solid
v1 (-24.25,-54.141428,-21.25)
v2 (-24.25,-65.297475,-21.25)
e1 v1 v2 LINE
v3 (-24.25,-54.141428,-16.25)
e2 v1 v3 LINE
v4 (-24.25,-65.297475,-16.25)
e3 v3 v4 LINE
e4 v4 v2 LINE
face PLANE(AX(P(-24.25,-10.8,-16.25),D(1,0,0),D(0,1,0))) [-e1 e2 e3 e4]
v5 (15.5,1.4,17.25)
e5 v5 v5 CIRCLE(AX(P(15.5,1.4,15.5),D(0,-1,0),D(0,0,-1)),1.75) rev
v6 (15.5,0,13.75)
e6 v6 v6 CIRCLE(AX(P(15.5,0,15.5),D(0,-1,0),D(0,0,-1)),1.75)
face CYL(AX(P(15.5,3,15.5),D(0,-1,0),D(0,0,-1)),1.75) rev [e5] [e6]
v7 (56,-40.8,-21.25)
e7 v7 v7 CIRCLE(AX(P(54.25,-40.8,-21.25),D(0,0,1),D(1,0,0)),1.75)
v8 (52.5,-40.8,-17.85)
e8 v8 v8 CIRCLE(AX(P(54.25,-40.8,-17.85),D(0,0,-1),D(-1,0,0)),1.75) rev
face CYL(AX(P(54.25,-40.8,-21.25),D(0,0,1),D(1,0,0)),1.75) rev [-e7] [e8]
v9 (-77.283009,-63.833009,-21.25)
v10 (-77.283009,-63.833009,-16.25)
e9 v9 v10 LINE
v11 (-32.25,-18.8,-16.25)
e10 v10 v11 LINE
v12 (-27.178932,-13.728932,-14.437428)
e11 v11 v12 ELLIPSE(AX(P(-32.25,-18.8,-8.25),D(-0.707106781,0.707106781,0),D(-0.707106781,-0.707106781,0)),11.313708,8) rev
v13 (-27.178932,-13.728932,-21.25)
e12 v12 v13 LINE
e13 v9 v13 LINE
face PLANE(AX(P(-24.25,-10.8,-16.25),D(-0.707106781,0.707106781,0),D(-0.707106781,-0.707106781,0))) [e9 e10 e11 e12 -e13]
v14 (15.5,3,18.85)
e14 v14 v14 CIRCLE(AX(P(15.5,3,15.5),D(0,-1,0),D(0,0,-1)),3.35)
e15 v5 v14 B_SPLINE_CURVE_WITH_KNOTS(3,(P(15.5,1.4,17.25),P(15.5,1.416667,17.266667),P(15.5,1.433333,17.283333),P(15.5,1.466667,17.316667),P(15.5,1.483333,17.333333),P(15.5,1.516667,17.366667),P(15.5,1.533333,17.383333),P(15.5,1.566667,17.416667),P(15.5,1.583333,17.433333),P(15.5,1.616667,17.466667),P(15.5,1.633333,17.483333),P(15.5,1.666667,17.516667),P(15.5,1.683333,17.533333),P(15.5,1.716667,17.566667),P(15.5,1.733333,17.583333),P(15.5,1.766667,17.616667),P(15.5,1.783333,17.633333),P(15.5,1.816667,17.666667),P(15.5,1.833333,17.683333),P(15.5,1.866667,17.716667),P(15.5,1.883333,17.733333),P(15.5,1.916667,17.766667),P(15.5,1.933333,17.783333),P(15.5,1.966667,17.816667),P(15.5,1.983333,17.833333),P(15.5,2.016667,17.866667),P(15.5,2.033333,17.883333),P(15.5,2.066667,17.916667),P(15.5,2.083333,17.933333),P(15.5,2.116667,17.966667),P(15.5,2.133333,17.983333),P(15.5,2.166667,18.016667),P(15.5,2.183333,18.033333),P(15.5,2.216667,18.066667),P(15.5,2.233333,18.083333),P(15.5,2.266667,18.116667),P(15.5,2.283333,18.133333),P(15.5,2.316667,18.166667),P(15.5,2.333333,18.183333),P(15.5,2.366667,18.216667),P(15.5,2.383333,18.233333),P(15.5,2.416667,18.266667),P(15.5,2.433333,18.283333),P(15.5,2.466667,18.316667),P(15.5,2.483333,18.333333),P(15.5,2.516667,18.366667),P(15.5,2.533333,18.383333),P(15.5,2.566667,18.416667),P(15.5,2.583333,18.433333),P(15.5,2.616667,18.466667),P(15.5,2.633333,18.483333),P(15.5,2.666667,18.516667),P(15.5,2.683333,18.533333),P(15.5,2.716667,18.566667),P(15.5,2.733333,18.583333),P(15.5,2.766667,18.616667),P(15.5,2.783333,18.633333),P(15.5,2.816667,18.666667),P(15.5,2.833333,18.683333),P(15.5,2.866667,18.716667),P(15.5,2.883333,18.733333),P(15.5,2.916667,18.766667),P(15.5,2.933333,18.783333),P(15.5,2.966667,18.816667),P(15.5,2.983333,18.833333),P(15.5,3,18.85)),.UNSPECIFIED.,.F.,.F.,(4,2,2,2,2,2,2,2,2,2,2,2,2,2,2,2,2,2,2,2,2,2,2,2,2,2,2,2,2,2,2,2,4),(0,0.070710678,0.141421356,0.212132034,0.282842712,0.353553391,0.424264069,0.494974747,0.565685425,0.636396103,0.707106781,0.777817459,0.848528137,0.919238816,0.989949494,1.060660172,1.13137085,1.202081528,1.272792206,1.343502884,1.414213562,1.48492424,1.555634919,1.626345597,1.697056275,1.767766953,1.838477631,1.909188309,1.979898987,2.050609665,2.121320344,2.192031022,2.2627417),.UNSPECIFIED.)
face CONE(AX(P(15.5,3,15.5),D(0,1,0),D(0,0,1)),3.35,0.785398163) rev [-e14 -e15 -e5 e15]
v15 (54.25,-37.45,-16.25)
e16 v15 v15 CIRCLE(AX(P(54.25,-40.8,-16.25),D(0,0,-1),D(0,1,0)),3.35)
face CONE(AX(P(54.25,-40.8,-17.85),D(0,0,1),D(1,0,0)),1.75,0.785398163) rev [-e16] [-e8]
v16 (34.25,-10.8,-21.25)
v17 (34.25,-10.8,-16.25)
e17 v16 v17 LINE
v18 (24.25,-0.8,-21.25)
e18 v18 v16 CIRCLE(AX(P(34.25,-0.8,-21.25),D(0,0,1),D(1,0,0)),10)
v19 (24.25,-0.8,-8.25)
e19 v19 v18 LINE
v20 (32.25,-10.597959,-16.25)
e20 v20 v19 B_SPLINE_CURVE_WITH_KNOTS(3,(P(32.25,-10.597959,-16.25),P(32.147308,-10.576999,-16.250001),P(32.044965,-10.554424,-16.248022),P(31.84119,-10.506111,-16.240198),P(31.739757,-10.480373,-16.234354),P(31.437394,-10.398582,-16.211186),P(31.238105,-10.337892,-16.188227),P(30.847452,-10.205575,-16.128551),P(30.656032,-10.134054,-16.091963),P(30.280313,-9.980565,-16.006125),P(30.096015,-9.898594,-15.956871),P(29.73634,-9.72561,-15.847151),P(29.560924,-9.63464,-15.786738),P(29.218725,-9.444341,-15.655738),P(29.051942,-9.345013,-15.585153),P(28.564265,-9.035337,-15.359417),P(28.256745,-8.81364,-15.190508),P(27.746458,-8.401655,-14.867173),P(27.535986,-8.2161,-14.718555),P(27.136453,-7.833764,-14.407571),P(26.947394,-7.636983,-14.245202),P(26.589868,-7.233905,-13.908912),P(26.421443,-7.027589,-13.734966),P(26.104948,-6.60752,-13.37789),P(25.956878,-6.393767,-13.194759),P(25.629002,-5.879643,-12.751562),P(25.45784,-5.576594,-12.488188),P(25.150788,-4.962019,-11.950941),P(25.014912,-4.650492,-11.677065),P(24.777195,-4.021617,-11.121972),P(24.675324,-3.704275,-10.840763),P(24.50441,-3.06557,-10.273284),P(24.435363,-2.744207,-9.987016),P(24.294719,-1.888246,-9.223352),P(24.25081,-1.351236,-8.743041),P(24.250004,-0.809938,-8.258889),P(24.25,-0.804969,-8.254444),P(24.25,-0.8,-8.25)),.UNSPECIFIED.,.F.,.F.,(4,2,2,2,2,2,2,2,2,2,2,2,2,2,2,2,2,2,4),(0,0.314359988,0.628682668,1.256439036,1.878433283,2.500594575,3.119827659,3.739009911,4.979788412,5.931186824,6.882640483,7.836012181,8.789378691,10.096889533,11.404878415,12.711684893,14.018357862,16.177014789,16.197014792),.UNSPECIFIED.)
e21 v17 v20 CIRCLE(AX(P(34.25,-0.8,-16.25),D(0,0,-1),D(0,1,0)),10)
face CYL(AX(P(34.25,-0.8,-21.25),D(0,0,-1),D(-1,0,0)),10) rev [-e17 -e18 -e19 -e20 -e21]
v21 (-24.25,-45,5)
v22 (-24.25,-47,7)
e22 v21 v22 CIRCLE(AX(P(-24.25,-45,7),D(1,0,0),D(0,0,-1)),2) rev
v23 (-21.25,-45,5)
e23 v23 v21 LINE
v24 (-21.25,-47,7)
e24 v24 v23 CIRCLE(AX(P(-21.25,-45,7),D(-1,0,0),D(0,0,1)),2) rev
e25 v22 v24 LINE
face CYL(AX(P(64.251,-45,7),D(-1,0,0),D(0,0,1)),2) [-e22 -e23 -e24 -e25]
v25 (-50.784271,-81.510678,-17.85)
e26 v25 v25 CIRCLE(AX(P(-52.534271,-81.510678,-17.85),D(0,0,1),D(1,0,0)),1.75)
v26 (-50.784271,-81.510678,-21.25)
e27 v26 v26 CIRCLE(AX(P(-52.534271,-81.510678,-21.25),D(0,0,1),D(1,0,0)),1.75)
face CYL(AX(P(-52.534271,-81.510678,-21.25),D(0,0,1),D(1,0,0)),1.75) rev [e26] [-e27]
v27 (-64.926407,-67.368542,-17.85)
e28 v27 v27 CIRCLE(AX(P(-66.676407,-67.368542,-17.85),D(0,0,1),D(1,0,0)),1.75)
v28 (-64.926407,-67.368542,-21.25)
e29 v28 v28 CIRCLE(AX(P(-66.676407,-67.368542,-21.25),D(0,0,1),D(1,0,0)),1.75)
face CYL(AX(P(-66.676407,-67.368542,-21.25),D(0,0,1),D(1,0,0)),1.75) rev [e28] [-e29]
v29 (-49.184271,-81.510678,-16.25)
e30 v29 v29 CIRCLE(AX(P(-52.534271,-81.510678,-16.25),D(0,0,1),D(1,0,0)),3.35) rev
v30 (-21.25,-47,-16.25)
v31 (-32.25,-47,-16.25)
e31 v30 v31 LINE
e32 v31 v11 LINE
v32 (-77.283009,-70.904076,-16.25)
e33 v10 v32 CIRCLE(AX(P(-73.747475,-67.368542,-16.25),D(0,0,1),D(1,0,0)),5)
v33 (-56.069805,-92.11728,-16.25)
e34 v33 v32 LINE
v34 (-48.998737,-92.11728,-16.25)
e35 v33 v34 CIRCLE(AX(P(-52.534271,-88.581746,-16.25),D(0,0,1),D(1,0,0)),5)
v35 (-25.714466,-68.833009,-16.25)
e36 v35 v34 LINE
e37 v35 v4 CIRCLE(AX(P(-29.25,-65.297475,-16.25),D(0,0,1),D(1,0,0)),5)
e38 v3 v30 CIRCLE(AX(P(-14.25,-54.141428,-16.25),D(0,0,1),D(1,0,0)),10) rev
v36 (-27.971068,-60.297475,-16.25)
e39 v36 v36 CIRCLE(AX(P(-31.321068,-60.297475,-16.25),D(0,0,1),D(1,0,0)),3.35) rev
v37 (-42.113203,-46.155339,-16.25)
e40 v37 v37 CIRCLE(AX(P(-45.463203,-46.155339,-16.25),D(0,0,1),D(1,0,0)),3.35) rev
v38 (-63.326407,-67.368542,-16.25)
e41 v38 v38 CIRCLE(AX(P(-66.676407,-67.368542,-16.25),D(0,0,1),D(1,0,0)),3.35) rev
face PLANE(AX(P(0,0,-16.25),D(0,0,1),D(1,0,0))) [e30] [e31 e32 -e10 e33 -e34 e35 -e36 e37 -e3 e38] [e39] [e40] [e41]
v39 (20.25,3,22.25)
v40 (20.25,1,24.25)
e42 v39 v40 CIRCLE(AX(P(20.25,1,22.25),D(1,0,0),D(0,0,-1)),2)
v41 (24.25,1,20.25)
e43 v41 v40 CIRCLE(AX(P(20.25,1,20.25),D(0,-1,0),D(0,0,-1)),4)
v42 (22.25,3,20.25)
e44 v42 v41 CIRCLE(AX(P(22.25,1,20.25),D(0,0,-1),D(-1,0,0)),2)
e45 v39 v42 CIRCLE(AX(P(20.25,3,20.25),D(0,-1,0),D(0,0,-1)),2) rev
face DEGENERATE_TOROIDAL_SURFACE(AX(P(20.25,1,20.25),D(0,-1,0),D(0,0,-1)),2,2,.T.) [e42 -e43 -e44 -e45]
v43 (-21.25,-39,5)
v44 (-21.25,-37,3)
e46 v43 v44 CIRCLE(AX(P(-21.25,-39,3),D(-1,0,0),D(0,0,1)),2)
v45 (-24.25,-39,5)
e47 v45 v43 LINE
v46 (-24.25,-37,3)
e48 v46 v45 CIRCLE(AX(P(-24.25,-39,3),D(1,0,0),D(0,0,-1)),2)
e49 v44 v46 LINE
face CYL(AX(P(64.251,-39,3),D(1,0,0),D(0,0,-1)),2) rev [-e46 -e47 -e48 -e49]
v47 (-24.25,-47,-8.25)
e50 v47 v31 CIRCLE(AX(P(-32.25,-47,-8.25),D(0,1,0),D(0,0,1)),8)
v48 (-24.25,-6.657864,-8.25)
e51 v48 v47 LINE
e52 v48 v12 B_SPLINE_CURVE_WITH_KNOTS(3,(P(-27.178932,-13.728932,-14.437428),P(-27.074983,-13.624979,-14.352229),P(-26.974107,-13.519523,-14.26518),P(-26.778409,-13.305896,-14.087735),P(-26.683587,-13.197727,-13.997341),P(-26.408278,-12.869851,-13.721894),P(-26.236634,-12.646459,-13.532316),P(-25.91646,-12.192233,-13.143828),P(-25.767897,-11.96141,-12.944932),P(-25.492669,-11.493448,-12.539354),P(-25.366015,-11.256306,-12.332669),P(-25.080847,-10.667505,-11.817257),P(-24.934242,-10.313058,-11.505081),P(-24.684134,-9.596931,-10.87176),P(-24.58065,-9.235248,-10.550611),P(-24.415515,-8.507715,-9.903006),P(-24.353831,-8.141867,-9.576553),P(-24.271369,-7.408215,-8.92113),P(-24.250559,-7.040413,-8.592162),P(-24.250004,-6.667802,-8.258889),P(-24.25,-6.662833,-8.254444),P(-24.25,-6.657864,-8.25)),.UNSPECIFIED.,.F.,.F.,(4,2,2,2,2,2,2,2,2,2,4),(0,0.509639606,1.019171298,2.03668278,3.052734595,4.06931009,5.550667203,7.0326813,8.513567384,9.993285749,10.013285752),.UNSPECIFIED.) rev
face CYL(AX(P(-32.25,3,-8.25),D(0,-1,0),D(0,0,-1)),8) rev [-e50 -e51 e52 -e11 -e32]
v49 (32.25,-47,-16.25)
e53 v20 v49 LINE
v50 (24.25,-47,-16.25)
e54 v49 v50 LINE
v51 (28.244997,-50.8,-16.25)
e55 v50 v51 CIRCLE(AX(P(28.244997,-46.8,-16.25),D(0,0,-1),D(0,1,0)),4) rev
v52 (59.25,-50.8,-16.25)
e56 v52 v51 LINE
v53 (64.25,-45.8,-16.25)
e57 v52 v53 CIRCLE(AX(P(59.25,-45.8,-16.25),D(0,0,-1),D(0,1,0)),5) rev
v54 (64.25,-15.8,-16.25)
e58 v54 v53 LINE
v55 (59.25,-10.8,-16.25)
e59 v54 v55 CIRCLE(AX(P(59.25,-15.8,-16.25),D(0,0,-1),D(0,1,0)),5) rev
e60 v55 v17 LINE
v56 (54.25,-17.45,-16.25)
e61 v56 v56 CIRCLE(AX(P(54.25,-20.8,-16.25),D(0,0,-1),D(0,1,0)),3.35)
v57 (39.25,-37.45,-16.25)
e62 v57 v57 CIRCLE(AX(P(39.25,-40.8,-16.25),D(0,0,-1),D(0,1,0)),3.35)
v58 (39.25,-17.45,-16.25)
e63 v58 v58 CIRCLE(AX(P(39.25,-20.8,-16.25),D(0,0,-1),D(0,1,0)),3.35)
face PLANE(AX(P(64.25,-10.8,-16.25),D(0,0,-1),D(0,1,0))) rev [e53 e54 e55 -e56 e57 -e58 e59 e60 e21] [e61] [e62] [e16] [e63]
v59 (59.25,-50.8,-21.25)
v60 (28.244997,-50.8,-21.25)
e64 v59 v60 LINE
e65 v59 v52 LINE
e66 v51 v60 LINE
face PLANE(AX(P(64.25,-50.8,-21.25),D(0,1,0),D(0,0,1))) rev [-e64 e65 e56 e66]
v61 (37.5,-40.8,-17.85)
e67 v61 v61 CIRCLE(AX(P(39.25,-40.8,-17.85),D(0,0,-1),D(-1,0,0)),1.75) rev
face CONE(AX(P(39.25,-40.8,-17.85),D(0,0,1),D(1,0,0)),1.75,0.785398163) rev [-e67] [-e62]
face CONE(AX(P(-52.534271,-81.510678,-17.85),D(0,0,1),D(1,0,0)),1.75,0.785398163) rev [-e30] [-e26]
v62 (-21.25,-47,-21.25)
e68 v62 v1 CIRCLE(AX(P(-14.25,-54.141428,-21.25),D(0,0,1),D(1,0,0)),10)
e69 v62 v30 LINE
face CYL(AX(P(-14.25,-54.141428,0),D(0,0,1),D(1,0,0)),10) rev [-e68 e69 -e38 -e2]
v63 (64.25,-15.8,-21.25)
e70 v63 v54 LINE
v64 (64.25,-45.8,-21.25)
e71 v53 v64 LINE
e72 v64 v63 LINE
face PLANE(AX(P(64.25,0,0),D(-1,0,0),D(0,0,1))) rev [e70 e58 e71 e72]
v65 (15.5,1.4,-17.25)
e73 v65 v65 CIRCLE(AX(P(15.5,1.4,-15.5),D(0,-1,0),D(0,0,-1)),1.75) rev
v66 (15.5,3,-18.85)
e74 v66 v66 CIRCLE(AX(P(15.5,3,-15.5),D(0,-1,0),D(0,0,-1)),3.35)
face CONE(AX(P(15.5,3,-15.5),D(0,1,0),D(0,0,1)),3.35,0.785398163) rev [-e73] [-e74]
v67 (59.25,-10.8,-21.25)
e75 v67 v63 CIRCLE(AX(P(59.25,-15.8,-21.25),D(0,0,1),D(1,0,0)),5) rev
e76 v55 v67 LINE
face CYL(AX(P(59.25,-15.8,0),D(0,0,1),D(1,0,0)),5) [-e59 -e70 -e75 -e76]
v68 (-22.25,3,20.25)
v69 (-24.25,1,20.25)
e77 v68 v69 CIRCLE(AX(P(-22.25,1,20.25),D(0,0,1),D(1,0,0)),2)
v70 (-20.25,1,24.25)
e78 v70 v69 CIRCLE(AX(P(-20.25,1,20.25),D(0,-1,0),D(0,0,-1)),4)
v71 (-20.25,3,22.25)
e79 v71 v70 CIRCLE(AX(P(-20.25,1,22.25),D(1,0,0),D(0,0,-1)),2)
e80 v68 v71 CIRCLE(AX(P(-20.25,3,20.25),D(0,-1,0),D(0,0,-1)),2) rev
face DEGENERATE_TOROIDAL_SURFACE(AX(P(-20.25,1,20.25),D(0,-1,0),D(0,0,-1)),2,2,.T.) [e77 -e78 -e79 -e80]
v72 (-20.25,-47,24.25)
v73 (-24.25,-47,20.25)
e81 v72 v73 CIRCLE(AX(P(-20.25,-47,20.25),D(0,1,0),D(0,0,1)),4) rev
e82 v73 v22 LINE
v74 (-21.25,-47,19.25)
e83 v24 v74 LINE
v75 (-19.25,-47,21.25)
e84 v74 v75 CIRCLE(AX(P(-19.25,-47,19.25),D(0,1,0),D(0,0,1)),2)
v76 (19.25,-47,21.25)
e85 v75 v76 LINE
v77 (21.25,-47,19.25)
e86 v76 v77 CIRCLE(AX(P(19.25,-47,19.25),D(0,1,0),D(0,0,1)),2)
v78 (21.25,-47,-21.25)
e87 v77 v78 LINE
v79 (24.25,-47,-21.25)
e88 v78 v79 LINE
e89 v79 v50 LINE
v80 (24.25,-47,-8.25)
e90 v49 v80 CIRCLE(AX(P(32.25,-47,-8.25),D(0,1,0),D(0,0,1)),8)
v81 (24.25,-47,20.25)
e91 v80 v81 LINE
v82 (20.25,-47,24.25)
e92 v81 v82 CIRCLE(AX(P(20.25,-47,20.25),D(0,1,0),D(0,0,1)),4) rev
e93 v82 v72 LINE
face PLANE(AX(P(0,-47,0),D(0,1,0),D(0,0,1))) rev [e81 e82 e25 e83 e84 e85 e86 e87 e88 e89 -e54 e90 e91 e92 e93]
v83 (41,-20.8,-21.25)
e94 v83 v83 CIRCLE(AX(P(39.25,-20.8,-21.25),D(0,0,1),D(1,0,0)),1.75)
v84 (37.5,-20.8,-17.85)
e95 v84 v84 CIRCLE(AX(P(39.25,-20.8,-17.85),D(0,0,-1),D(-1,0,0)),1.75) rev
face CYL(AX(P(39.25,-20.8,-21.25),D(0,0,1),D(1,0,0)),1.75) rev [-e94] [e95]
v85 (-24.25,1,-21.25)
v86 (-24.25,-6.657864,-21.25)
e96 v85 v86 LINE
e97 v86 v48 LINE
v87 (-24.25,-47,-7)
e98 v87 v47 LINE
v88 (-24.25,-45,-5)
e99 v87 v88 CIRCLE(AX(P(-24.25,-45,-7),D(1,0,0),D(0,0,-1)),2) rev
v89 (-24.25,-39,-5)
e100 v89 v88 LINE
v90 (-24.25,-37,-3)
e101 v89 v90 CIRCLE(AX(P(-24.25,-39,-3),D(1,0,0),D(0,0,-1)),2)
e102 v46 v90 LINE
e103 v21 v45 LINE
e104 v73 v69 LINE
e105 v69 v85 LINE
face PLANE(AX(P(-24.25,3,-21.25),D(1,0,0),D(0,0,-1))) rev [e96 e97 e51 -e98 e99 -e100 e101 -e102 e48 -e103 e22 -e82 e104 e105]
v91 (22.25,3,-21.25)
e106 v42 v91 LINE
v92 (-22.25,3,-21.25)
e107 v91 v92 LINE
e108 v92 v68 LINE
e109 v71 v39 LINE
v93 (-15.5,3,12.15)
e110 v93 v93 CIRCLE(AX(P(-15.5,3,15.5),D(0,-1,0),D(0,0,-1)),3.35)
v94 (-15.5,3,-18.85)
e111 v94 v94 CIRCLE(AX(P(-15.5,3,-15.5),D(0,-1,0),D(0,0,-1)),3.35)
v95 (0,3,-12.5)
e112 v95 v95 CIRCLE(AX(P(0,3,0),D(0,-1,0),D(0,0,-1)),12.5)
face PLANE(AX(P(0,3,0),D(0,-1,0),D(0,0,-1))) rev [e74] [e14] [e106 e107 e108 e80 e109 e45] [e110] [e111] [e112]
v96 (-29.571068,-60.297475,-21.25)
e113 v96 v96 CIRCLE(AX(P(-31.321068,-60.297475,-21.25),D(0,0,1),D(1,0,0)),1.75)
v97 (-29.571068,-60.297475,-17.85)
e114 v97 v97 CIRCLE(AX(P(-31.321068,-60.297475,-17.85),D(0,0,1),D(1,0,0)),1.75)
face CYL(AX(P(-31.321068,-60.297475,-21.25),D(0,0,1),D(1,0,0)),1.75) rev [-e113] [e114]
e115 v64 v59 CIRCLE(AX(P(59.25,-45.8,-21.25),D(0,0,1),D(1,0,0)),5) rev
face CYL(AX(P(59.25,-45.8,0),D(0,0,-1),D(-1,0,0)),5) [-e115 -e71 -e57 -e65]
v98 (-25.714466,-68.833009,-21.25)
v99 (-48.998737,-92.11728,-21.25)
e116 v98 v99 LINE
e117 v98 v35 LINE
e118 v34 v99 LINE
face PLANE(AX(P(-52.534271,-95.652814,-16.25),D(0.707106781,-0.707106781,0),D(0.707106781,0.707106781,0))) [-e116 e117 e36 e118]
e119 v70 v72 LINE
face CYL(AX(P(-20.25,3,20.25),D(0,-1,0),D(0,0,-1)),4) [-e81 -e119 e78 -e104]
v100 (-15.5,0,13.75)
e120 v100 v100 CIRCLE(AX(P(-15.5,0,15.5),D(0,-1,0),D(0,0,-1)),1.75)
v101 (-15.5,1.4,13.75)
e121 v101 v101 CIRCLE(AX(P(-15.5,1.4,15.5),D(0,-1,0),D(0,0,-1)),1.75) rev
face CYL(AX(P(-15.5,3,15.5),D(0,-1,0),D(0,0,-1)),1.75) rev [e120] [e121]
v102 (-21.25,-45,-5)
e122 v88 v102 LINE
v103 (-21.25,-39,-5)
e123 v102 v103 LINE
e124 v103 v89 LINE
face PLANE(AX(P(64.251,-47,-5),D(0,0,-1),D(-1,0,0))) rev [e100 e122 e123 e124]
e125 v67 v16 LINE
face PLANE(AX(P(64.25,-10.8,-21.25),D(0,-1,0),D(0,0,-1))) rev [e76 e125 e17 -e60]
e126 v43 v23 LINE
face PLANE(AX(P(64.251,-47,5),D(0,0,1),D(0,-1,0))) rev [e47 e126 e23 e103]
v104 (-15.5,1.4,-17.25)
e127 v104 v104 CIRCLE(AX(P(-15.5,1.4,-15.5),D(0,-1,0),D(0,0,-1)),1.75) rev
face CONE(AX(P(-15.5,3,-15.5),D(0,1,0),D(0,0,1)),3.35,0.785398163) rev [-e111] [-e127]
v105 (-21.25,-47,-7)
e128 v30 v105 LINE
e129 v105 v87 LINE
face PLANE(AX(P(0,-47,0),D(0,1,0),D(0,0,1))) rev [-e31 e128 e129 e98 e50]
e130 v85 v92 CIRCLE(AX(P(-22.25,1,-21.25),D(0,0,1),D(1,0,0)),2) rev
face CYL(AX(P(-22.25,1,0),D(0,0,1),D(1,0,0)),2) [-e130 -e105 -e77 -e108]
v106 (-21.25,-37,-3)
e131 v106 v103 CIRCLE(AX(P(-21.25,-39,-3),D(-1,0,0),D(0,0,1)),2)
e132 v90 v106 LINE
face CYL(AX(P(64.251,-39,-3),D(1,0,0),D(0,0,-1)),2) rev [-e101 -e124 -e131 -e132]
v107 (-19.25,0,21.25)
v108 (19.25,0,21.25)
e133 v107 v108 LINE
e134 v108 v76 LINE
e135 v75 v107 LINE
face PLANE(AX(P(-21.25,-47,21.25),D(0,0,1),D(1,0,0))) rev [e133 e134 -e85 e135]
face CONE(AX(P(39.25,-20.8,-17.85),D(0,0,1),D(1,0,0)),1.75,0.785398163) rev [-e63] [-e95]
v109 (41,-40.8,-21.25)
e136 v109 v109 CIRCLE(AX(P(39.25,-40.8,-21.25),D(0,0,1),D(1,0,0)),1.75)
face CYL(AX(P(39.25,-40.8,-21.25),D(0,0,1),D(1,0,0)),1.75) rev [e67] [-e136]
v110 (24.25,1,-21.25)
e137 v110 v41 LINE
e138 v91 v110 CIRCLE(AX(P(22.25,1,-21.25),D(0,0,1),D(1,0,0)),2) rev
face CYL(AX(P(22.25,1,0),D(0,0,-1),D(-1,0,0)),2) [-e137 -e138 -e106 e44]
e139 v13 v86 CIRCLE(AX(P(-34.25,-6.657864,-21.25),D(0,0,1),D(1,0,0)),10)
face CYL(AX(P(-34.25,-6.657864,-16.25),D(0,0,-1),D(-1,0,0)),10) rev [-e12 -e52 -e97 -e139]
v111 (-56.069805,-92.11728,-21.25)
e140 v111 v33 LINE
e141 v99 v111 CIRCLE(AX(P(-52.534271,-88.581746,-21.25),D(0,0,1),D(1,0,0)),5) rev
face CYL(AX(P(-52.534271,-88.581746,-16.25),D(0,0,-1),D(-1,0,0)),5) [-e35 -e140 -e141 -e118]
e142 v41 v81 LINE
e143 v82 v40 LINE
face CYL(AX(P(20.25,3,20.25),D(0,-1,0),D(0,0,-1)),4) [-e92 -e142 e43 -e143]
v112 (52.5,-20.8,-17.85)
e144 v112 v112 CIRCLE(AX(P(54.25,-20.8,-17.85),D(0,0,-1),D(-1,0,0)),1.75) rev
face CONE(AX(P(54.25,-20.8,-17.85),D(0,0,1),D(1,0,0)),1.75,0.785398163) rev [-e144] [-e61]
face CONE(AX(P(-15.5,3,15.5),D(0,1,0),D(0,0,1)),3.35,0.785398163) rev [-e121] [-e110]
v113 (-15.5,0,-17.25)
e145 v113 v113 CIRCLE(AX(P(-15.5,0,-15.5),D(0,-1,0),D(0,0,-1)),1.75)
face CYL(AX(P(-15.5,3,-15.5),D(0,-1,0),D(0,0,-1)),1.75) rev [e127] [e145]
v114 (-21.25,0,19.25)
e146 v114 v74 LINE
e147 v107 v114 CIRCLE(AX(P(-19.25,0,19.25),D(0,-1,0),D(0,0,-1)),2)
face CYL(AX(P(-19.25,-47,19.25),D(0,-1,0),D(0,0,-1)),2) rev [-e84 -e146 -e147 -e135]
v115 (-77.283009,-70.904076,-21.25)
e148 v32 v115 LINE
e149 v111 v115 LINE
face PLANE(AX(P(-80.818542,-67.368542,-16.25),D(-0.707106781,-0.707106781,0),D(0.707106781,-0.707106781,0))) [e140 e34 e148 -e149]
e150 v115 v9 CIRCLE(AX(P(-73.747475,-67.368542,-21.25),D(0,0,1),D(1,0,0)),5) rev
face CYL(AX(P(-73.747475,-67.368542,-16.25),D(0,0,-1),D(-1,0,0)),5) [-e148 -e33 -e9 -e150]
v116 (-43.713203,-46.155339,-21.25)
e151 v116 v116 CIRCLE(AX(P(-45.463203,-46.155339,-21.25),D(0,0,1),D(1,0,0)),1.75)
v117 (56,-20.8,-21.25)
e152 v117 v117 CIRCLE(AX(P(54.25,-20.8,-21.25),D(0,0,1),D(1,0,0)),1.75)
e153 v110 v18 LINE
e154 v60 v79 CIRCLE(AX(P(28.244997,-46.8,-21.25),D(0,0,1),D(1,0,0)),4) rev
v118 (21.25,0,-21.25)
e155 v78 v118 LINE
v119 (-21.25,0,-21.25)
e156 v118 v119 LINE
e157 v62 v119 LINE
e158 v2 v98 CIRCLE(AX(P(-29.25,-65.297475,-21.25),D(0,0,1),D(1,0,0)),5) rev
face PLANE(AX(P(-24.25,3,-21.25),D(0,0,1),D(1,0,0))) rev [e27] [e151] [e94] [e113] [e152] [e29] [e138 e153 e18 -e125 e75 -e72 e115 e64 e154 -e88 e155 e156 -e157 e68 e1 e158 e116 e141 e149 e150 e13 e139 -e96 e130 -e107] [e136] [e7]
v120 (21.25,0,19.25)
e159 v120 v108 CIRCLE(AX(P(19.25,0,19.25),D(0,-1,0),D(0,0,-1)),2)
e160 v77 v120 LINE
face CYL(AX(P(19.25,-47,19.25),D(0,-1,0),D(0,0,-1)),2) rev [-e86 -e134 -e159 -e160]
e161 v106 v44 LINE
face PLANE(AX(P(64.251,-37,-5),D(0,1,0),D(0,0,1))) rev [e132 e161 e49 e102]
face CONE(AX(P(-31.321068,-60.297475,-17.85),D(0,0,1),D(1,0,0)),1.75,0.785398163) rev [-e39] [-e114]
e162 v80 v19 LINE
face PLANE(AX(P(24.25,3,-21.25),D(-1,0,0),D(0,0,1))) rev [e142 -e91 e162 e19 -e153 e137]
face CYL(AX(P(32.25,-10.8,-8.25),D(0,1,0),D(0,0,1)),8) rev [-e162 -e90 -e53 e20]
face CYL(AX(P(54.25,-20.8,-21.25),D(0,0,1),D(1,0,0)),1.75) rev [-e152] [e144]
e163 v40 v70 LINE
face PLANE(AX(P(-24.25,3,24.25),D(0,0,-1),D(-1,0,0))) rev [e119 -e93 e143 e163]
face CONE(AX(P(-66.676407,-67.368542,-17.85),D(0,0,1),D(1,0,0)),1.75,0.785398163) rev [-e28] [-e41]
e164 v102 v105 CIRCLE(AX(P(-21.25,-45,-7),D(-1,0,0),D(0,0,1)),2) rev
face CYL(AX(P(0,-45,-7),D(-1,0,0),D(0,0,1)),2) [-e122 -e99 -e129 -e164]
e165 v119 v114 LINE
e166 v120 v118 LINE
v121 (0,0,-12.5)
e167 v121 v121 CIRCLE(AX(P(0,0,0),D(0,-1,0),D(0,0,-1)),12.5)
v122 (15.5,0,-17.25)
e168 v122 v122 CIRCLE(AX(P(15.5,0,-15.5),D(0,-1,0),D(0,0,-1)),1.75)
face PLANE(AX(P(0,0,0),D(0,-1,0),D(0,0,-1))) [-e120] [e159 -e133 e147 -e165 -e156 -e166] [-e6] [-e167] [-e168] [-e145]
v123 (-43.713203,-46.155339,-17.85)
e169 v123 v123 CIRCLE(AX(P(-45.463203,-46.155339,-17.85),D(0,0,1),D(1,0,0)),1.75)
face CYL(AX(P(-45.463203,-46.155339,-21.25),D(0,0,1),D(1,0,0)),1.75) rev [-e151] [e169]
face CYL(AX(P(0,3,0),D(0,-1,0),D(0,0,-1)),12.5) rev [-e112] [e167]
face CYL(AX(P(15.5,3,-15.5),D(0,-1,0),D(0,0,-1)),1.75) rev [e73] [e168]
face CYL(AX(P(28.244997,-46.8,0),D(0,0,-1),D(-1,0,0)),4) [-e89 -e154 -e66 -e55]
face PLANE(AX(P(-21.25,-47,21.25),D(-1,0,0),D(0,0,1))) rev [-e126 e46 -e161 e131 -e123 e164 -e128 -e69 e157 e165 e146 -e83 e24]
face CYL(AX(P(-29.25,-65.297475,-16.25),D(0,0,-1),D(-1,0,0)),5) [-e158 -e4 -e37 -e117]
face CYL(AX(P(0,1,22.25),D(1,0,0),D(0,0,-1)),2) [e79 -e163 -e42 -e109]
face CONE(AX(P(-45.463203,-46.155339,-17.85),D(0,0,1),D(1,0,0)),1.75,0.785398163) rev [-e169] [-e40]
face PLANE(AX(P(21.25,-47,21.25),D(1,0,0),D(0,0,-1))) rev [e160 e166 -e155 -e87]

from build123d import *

# Parameters (mm, degrees)
SKETCH1_W           = 48.5
SKETCH1_H           = 45.5
BOSS_EXTRUDE1_DEPTH = 3
BOSS_EXTRUDE2_DEPTH = 47
SKETCH3_W           = 5
SKETCH3_H           = 40
BOSS_EXTRUDE3_DEPTH = 40
BOSS_EXTRUDE4_DEPTH = 5
FILLET1_R           = 8
SKETCH5_R           = 1.75
SKETCH5_R_2         = 12.5
CUT_EXTRUDE1_DEPTH  = 128.550617748
SKETCH7_R           = 1.75
CUT_EXTRUDE2_DEPTH  = 132.610590713
FILLET2_START       = -21.25
FILLET2_DEPTH       = 13
FILLET2_2_DEPTH     = 5
FILLET2_START_2     = -16.7781
FILLET2_3_DEPTH     = 8.5281
FILLET2_START_3     = -47.0000001
FILLET2_4_DEPTH     = 46.2000001
FILLET3_R           = 5
FILLET4_R           = 2
CHAMFER2_SIZE       = 1.6
FILLET5_R           = 4
FILLET7_R           = 4
FILLET8_R           = 2
CUT_EXTRUDE3_REACH  = 133.064
SKETCH8_W           = 10
SKETCH8_H           = 10
FILLET9_R           = 2
CHAMFER3_SIZE       = 1.6


with BuildPart() as part:
    # Sketch1 → Boss-Extrude1 (new body)
    with BuildSketch(Plane(origin=(0, 0, 0), x_dir=(1, 0, 0), z_dir=(0, 1, 0))):
        with Locations((0, -1.5)):
            Rectangle(SKETCH1_W, SKETCH1_H)
    extrude(amount=BOSS_EXTRUDE1_DEPTH)

    # Sketch2 → Boss-Extrude2 (add)
    with BuildSketch(Plane.XZ):
        Polygon((-21.25, 21.25), (21.25, 21.25), (21.25, -21.25), (24.25, -21.25), (24.25, 24.25), (-24.25, 24.25), (-24.25, -21.25), (-21.25, -21.25), align=None)
    extrude(amount=BOSS_EXTRUDE2_DEPTH)

    # Sketch3 → Boss-Extrude3 (add)
    with BuildSketch(Plane(origin=(24.25, 0, 0), x_dir=(0, 0, -1), z_dir=(1, 0, 0))):
        with Locations((18.75, -30.8)):
            Rectangle(SKETCH3_W, SKETCH3_H)
    extrude(amount=BOSS_EXTRUDE3_DEPTH)

    # Sketch4 → Boss-Extrude4 (add)
    with BuildSketch(Plane(origin=(0, 0, -21.25), x_dir=(-1, 0, 0), z_dir=(0, 0, -1))):
        Polygon((24.25, -10.8), (80.818542495, -67.368542495), (52.534271247, -95.652813742), (24.25, -67.368542495), align=None)
    extrude(amount=-BOSS_EXTRUDE4_DEPTH)

    # Fillet1
    fillet1_edges = [part.edges().sort_by_distance(p)[0] for p in [
        (24.25, -28.9, -16.25),
        (-24.25, -28.9, -16.25),
    ]]
    fillet(fillet1_edges, radius=FILLET1_R)

    # Sketch5 → Cut-Extrude1 (cut, through all)
    with BuildSketch(Plane.XZ):
        with Locations(Location((-15.5, 15.5, 0), (0, 0, 270))):
            Circle(SKETCH5_R)
        with Locations(Location((15.5, 15.5, 0), (0, 0, 270))):
            Circle(SKETCH5_R)
        with Locations(Location((15.5, -15.5, 0), (0, 0, 270))):
            Circle(SKETCH5_R)
        with Locations(Location((-15.5, -15.5, 0), (0, 0, 270))):
            Circle(SKETCH5_R)
        with Locations(Location((0, 0, 0), (0, 0, 270))):
            Circle(SKETCH5_R_2)
    extrude(amount=-CUT_EXTRUDE1_DEPTH, mode=Mode.SUBTRACT)

    # Sketch7 → Cut-Extrude2 (cut, through all)
    with BuildSketch(Plane.XY.offset(-16.25)):
        with Locations((54.25, -20.8)):
            Circle(SKETCH7_R)
        with Locations((54.25, -40.8)):
            Circle(SKETCH7_R)
        with Locations((-66.676406871, -67.368542495)):
            Circle(SKETCH7_R)
        with Locations((-52.534271247, -81.510678119)):
            Circle(SKETCH7_R)
        with Locations((-45.463203436, -46.155339059)):
            Circle(SKETCH7_R)
        with Locations((-31.321067812, -60.297474683)):
            Circle(SKETCH7_R)
        with Locations((39.25, -20.8)):
            Circle(SKETCH7_R)
        with Locations((39.25, -40.8)):
            Circle(SKETCH7_R)
    extrude(amount=-CUT_EXTRUDE2_DEPTH, mode=Mode.SUBTRACT)

    # Fillet2: read off the stored shape, not the designer's step
    # Fillet2 outline → Fillet2 (add)
    with BuildSketch(Plane.XY.offset(FILLET2_START)):
        with BuildLine():
            Line((24.25, -10.8), (34.25, -10.8))
            ThreePointArc((34.25, -10.8), (27.178932188, -7.871067812), (24.25, -0.8))
            Line((24.25, -0.8), (24.25, -10.8))
        make_face()
    extrude(amount=FILLET2_DEPTH)

    # Fillet2 2 outline → Fillet2 2 (add)
    with BuildSketch(Plane.XY.offset(FILLET2_START)):
        with BuildLine():
            Line((-27.178932188, -13.728932188), (-24.25, -10.8))
            Line((-24.25, -10.8), (-24.25, -6.657864376))
            ThreePointArc((-24.25, -6.657864376), (-25.011204675, -10.4846987), (-27.178932188, -13.728932188))
        make_face()
        with BuildLine():
            ThreePointArc((-24.25, -54.141428429), (-23.469544457, -50.268445083), (-21.25, -47))
            Line((-21.25, -47), (-24.25, -47))
            Line((-24.25, -47), (-24.25, -54.141428429))
        make_face()
    extrude(amount=FILLET2_2_DEPTH)

    # Fillet2 3 outline → Fillet2 3 (add)
    with BuildSketch(Plane.XY.offset(FILLET2_START_2)):
        with BuildLine():
            Line((-27.178932188, -13.728932188), (-24.25, -10.8))
            Line((-24.25, -10.8), (-24.25, -6.657864376))
            ThreePointArc((-24.25, -6.657864376), (-25.011204675, -10.4846987), (-27.178932188, -13.728932188))
        make_face()
    extrude(amount=FILLET2_3_DEPTH)

    # Fillet2 4 outline → Fillet2 4 (cut)
    with BuildSketch(Plane(origin=(0, 0, 0), x_dir=(1, 0, 0), z_dir=(0, 1, 0)).offset(FILLET2_START_3)):
        with BuildLine():
            Line((36, 16.250000001), (32.25, 16.25))
            ThreePointArc((32.25, 16.25), (26.593145751, 13.906854249), (24.25, 8.25))
            Line((24.25, 8.25), (36, 8.25))
            Line((36, 8.25), (36, 16.250000001))
        make_face()
        with BuildLine():
            ThreePointArc((-24.25, 8.25), (-25.541796068, 12.608898943), (-29, 15.560095758))
            Line((-29, 15.560095758), (-29, 8.25))
            Line((-29, 8.25), (-24.25, 8.25))
        make_face()
    extrude(amount=FILLET2_4_DEPTH, mode=Mode.SUBTRACT)

    # Fillet3
    fillet3_edges = [part.edges().sort_by_distance(p)[0] for p in [
        (64.25, -10.8, -18.75),
        (64.25, -50.8, -18.75),
        (-24.25, -67.368542495, -18.75),
        (-80.818542495, -67.368542495, -18.75),
        (-52.534271247, -95.652813742, -18.75),
    ]]
    fillet(fillet3_edges, radius=FILLET3_R)

    # Fillet4
    fillet4_edges = [part.edges().sort_by_distance(p)[0] for p in [
        (-21.25, -23.5, 21.25),
        (21.25, -23.5, 21.25),
    ]]
    fillet(fillet4_edges, radius=FILLET4_R)

    # Chamfer2
    chamfer2_edges = [part.edges().sort_by_distance(p)[0] for p in [
        (-15.5, 3, -13.75),
        (15.5, 3, -13.75),
        (15.5, 3, 17.25),
        (-15.5, 3, 17.25),
    ]]
    chamfer(chamfer2_edges, length=CHAMFER2_SIZE)

    # Fillet5
    # the kernel refuses this fillet: 4 mm, written as the material it takes off along each edge
    with BuildSketch(Plane(origin=(24.25, -50.8, -6.262507822), x_dir=(1, 0, 0), z_dir=(0, 0, -1))) as fillet5_piece_1:
        with BuildLine():
            CenterArc((3.994996871, -4), FILLET5_R, 90, 87.134016017)
            Line((0, -3.8), (-0.079899937, -3.796))
            ThreePointArc((-0.079899937, -3.796), (-0.08, -1.9), (-0.08, 0))
            Line((-0.08, 0), (0, 0.08))
            Line((0, 0.08), (3.994996871, 0.08))
            Line((3.994996871, 0.08), (3.994996871, 0))
        make_face()
    extrude(amount=24.974984355, mode=Mode.SUBTRACT)

    # Fillet7
    fillet7_edges = [part.edges().sort_by_distance(p)[0] for p in [
        (24.25, -22, 24.25),
        (-24.25, -22, 24.25),
    ]]
    fillet(fillet7_edges, radius=FILLET7_R)

    # Fillet8
    fillet8_edges = [part.edges().sort_by_distance(p)[0] for p in [
        (24.25, 3, -0.5),
        (0, 3, 24.25),
        (-23.078427125, 3, 23.078427125),
        (23.078427125, 3, 23.078427125),
        (-24.25, 3, -0.5),
    ]]
    fillet(fillet8_edges, radius=FILLET8_R)

    # Sketch8 → Cut-Extrude3 (cut, up to next)
    with BuildSketch(Plane.ZY.offset(24.25), mode=Mode.PRIVATE) as cut_extrude3_sk1:
        with Locations((0, -42)):
            Rectangle(SKETCH8_W, SKETCH8_H)
    cut_extrude3_tool1 = extrude(cut_extrude3_sk1.sketch, amount=-CUT_EXTRUDE3_REACH, mode=Mode.PRIVATE) & part.part
    add(cut_extrude3_tool1.solids().sort_by_distance((-24.25, -42, 0))[0], mode=Mode.SUBTRACT)

    # Fillet9
    fillet9_edges = [part.edges().sort_by_distance(p)[0] for p in [
        (-22.75, -47, -5),
        (-22.75, -37, -5),
        (-22.75, -37, 5),
        (-22.75, -47, 5),
    ]]
    fillet(fillet9_edges, radius=FILLET9_R)

    # Chamfer3
    chamfer3_edges = [part.edges().sort_by_distance(p)[0] for p in [
        (-54.284271247, -81.510678119, -16.25),
        (-47.213203436, -46.155339059, -16.25),
        (-68.426406871, -67.368542495, -16.25),
        (52.5, -40.8, -16.25),
        (37.5, -40.8, -16.25),
        (37.5, -20.8, -16.25),
        (-33.071067812, -60.297474683, -16.25),
        (52.5, -20.8, -16.25),
    ]]
    chamfer(chamfer3_edges, length=CHAMFER3_SIZE)


solid = part.part
